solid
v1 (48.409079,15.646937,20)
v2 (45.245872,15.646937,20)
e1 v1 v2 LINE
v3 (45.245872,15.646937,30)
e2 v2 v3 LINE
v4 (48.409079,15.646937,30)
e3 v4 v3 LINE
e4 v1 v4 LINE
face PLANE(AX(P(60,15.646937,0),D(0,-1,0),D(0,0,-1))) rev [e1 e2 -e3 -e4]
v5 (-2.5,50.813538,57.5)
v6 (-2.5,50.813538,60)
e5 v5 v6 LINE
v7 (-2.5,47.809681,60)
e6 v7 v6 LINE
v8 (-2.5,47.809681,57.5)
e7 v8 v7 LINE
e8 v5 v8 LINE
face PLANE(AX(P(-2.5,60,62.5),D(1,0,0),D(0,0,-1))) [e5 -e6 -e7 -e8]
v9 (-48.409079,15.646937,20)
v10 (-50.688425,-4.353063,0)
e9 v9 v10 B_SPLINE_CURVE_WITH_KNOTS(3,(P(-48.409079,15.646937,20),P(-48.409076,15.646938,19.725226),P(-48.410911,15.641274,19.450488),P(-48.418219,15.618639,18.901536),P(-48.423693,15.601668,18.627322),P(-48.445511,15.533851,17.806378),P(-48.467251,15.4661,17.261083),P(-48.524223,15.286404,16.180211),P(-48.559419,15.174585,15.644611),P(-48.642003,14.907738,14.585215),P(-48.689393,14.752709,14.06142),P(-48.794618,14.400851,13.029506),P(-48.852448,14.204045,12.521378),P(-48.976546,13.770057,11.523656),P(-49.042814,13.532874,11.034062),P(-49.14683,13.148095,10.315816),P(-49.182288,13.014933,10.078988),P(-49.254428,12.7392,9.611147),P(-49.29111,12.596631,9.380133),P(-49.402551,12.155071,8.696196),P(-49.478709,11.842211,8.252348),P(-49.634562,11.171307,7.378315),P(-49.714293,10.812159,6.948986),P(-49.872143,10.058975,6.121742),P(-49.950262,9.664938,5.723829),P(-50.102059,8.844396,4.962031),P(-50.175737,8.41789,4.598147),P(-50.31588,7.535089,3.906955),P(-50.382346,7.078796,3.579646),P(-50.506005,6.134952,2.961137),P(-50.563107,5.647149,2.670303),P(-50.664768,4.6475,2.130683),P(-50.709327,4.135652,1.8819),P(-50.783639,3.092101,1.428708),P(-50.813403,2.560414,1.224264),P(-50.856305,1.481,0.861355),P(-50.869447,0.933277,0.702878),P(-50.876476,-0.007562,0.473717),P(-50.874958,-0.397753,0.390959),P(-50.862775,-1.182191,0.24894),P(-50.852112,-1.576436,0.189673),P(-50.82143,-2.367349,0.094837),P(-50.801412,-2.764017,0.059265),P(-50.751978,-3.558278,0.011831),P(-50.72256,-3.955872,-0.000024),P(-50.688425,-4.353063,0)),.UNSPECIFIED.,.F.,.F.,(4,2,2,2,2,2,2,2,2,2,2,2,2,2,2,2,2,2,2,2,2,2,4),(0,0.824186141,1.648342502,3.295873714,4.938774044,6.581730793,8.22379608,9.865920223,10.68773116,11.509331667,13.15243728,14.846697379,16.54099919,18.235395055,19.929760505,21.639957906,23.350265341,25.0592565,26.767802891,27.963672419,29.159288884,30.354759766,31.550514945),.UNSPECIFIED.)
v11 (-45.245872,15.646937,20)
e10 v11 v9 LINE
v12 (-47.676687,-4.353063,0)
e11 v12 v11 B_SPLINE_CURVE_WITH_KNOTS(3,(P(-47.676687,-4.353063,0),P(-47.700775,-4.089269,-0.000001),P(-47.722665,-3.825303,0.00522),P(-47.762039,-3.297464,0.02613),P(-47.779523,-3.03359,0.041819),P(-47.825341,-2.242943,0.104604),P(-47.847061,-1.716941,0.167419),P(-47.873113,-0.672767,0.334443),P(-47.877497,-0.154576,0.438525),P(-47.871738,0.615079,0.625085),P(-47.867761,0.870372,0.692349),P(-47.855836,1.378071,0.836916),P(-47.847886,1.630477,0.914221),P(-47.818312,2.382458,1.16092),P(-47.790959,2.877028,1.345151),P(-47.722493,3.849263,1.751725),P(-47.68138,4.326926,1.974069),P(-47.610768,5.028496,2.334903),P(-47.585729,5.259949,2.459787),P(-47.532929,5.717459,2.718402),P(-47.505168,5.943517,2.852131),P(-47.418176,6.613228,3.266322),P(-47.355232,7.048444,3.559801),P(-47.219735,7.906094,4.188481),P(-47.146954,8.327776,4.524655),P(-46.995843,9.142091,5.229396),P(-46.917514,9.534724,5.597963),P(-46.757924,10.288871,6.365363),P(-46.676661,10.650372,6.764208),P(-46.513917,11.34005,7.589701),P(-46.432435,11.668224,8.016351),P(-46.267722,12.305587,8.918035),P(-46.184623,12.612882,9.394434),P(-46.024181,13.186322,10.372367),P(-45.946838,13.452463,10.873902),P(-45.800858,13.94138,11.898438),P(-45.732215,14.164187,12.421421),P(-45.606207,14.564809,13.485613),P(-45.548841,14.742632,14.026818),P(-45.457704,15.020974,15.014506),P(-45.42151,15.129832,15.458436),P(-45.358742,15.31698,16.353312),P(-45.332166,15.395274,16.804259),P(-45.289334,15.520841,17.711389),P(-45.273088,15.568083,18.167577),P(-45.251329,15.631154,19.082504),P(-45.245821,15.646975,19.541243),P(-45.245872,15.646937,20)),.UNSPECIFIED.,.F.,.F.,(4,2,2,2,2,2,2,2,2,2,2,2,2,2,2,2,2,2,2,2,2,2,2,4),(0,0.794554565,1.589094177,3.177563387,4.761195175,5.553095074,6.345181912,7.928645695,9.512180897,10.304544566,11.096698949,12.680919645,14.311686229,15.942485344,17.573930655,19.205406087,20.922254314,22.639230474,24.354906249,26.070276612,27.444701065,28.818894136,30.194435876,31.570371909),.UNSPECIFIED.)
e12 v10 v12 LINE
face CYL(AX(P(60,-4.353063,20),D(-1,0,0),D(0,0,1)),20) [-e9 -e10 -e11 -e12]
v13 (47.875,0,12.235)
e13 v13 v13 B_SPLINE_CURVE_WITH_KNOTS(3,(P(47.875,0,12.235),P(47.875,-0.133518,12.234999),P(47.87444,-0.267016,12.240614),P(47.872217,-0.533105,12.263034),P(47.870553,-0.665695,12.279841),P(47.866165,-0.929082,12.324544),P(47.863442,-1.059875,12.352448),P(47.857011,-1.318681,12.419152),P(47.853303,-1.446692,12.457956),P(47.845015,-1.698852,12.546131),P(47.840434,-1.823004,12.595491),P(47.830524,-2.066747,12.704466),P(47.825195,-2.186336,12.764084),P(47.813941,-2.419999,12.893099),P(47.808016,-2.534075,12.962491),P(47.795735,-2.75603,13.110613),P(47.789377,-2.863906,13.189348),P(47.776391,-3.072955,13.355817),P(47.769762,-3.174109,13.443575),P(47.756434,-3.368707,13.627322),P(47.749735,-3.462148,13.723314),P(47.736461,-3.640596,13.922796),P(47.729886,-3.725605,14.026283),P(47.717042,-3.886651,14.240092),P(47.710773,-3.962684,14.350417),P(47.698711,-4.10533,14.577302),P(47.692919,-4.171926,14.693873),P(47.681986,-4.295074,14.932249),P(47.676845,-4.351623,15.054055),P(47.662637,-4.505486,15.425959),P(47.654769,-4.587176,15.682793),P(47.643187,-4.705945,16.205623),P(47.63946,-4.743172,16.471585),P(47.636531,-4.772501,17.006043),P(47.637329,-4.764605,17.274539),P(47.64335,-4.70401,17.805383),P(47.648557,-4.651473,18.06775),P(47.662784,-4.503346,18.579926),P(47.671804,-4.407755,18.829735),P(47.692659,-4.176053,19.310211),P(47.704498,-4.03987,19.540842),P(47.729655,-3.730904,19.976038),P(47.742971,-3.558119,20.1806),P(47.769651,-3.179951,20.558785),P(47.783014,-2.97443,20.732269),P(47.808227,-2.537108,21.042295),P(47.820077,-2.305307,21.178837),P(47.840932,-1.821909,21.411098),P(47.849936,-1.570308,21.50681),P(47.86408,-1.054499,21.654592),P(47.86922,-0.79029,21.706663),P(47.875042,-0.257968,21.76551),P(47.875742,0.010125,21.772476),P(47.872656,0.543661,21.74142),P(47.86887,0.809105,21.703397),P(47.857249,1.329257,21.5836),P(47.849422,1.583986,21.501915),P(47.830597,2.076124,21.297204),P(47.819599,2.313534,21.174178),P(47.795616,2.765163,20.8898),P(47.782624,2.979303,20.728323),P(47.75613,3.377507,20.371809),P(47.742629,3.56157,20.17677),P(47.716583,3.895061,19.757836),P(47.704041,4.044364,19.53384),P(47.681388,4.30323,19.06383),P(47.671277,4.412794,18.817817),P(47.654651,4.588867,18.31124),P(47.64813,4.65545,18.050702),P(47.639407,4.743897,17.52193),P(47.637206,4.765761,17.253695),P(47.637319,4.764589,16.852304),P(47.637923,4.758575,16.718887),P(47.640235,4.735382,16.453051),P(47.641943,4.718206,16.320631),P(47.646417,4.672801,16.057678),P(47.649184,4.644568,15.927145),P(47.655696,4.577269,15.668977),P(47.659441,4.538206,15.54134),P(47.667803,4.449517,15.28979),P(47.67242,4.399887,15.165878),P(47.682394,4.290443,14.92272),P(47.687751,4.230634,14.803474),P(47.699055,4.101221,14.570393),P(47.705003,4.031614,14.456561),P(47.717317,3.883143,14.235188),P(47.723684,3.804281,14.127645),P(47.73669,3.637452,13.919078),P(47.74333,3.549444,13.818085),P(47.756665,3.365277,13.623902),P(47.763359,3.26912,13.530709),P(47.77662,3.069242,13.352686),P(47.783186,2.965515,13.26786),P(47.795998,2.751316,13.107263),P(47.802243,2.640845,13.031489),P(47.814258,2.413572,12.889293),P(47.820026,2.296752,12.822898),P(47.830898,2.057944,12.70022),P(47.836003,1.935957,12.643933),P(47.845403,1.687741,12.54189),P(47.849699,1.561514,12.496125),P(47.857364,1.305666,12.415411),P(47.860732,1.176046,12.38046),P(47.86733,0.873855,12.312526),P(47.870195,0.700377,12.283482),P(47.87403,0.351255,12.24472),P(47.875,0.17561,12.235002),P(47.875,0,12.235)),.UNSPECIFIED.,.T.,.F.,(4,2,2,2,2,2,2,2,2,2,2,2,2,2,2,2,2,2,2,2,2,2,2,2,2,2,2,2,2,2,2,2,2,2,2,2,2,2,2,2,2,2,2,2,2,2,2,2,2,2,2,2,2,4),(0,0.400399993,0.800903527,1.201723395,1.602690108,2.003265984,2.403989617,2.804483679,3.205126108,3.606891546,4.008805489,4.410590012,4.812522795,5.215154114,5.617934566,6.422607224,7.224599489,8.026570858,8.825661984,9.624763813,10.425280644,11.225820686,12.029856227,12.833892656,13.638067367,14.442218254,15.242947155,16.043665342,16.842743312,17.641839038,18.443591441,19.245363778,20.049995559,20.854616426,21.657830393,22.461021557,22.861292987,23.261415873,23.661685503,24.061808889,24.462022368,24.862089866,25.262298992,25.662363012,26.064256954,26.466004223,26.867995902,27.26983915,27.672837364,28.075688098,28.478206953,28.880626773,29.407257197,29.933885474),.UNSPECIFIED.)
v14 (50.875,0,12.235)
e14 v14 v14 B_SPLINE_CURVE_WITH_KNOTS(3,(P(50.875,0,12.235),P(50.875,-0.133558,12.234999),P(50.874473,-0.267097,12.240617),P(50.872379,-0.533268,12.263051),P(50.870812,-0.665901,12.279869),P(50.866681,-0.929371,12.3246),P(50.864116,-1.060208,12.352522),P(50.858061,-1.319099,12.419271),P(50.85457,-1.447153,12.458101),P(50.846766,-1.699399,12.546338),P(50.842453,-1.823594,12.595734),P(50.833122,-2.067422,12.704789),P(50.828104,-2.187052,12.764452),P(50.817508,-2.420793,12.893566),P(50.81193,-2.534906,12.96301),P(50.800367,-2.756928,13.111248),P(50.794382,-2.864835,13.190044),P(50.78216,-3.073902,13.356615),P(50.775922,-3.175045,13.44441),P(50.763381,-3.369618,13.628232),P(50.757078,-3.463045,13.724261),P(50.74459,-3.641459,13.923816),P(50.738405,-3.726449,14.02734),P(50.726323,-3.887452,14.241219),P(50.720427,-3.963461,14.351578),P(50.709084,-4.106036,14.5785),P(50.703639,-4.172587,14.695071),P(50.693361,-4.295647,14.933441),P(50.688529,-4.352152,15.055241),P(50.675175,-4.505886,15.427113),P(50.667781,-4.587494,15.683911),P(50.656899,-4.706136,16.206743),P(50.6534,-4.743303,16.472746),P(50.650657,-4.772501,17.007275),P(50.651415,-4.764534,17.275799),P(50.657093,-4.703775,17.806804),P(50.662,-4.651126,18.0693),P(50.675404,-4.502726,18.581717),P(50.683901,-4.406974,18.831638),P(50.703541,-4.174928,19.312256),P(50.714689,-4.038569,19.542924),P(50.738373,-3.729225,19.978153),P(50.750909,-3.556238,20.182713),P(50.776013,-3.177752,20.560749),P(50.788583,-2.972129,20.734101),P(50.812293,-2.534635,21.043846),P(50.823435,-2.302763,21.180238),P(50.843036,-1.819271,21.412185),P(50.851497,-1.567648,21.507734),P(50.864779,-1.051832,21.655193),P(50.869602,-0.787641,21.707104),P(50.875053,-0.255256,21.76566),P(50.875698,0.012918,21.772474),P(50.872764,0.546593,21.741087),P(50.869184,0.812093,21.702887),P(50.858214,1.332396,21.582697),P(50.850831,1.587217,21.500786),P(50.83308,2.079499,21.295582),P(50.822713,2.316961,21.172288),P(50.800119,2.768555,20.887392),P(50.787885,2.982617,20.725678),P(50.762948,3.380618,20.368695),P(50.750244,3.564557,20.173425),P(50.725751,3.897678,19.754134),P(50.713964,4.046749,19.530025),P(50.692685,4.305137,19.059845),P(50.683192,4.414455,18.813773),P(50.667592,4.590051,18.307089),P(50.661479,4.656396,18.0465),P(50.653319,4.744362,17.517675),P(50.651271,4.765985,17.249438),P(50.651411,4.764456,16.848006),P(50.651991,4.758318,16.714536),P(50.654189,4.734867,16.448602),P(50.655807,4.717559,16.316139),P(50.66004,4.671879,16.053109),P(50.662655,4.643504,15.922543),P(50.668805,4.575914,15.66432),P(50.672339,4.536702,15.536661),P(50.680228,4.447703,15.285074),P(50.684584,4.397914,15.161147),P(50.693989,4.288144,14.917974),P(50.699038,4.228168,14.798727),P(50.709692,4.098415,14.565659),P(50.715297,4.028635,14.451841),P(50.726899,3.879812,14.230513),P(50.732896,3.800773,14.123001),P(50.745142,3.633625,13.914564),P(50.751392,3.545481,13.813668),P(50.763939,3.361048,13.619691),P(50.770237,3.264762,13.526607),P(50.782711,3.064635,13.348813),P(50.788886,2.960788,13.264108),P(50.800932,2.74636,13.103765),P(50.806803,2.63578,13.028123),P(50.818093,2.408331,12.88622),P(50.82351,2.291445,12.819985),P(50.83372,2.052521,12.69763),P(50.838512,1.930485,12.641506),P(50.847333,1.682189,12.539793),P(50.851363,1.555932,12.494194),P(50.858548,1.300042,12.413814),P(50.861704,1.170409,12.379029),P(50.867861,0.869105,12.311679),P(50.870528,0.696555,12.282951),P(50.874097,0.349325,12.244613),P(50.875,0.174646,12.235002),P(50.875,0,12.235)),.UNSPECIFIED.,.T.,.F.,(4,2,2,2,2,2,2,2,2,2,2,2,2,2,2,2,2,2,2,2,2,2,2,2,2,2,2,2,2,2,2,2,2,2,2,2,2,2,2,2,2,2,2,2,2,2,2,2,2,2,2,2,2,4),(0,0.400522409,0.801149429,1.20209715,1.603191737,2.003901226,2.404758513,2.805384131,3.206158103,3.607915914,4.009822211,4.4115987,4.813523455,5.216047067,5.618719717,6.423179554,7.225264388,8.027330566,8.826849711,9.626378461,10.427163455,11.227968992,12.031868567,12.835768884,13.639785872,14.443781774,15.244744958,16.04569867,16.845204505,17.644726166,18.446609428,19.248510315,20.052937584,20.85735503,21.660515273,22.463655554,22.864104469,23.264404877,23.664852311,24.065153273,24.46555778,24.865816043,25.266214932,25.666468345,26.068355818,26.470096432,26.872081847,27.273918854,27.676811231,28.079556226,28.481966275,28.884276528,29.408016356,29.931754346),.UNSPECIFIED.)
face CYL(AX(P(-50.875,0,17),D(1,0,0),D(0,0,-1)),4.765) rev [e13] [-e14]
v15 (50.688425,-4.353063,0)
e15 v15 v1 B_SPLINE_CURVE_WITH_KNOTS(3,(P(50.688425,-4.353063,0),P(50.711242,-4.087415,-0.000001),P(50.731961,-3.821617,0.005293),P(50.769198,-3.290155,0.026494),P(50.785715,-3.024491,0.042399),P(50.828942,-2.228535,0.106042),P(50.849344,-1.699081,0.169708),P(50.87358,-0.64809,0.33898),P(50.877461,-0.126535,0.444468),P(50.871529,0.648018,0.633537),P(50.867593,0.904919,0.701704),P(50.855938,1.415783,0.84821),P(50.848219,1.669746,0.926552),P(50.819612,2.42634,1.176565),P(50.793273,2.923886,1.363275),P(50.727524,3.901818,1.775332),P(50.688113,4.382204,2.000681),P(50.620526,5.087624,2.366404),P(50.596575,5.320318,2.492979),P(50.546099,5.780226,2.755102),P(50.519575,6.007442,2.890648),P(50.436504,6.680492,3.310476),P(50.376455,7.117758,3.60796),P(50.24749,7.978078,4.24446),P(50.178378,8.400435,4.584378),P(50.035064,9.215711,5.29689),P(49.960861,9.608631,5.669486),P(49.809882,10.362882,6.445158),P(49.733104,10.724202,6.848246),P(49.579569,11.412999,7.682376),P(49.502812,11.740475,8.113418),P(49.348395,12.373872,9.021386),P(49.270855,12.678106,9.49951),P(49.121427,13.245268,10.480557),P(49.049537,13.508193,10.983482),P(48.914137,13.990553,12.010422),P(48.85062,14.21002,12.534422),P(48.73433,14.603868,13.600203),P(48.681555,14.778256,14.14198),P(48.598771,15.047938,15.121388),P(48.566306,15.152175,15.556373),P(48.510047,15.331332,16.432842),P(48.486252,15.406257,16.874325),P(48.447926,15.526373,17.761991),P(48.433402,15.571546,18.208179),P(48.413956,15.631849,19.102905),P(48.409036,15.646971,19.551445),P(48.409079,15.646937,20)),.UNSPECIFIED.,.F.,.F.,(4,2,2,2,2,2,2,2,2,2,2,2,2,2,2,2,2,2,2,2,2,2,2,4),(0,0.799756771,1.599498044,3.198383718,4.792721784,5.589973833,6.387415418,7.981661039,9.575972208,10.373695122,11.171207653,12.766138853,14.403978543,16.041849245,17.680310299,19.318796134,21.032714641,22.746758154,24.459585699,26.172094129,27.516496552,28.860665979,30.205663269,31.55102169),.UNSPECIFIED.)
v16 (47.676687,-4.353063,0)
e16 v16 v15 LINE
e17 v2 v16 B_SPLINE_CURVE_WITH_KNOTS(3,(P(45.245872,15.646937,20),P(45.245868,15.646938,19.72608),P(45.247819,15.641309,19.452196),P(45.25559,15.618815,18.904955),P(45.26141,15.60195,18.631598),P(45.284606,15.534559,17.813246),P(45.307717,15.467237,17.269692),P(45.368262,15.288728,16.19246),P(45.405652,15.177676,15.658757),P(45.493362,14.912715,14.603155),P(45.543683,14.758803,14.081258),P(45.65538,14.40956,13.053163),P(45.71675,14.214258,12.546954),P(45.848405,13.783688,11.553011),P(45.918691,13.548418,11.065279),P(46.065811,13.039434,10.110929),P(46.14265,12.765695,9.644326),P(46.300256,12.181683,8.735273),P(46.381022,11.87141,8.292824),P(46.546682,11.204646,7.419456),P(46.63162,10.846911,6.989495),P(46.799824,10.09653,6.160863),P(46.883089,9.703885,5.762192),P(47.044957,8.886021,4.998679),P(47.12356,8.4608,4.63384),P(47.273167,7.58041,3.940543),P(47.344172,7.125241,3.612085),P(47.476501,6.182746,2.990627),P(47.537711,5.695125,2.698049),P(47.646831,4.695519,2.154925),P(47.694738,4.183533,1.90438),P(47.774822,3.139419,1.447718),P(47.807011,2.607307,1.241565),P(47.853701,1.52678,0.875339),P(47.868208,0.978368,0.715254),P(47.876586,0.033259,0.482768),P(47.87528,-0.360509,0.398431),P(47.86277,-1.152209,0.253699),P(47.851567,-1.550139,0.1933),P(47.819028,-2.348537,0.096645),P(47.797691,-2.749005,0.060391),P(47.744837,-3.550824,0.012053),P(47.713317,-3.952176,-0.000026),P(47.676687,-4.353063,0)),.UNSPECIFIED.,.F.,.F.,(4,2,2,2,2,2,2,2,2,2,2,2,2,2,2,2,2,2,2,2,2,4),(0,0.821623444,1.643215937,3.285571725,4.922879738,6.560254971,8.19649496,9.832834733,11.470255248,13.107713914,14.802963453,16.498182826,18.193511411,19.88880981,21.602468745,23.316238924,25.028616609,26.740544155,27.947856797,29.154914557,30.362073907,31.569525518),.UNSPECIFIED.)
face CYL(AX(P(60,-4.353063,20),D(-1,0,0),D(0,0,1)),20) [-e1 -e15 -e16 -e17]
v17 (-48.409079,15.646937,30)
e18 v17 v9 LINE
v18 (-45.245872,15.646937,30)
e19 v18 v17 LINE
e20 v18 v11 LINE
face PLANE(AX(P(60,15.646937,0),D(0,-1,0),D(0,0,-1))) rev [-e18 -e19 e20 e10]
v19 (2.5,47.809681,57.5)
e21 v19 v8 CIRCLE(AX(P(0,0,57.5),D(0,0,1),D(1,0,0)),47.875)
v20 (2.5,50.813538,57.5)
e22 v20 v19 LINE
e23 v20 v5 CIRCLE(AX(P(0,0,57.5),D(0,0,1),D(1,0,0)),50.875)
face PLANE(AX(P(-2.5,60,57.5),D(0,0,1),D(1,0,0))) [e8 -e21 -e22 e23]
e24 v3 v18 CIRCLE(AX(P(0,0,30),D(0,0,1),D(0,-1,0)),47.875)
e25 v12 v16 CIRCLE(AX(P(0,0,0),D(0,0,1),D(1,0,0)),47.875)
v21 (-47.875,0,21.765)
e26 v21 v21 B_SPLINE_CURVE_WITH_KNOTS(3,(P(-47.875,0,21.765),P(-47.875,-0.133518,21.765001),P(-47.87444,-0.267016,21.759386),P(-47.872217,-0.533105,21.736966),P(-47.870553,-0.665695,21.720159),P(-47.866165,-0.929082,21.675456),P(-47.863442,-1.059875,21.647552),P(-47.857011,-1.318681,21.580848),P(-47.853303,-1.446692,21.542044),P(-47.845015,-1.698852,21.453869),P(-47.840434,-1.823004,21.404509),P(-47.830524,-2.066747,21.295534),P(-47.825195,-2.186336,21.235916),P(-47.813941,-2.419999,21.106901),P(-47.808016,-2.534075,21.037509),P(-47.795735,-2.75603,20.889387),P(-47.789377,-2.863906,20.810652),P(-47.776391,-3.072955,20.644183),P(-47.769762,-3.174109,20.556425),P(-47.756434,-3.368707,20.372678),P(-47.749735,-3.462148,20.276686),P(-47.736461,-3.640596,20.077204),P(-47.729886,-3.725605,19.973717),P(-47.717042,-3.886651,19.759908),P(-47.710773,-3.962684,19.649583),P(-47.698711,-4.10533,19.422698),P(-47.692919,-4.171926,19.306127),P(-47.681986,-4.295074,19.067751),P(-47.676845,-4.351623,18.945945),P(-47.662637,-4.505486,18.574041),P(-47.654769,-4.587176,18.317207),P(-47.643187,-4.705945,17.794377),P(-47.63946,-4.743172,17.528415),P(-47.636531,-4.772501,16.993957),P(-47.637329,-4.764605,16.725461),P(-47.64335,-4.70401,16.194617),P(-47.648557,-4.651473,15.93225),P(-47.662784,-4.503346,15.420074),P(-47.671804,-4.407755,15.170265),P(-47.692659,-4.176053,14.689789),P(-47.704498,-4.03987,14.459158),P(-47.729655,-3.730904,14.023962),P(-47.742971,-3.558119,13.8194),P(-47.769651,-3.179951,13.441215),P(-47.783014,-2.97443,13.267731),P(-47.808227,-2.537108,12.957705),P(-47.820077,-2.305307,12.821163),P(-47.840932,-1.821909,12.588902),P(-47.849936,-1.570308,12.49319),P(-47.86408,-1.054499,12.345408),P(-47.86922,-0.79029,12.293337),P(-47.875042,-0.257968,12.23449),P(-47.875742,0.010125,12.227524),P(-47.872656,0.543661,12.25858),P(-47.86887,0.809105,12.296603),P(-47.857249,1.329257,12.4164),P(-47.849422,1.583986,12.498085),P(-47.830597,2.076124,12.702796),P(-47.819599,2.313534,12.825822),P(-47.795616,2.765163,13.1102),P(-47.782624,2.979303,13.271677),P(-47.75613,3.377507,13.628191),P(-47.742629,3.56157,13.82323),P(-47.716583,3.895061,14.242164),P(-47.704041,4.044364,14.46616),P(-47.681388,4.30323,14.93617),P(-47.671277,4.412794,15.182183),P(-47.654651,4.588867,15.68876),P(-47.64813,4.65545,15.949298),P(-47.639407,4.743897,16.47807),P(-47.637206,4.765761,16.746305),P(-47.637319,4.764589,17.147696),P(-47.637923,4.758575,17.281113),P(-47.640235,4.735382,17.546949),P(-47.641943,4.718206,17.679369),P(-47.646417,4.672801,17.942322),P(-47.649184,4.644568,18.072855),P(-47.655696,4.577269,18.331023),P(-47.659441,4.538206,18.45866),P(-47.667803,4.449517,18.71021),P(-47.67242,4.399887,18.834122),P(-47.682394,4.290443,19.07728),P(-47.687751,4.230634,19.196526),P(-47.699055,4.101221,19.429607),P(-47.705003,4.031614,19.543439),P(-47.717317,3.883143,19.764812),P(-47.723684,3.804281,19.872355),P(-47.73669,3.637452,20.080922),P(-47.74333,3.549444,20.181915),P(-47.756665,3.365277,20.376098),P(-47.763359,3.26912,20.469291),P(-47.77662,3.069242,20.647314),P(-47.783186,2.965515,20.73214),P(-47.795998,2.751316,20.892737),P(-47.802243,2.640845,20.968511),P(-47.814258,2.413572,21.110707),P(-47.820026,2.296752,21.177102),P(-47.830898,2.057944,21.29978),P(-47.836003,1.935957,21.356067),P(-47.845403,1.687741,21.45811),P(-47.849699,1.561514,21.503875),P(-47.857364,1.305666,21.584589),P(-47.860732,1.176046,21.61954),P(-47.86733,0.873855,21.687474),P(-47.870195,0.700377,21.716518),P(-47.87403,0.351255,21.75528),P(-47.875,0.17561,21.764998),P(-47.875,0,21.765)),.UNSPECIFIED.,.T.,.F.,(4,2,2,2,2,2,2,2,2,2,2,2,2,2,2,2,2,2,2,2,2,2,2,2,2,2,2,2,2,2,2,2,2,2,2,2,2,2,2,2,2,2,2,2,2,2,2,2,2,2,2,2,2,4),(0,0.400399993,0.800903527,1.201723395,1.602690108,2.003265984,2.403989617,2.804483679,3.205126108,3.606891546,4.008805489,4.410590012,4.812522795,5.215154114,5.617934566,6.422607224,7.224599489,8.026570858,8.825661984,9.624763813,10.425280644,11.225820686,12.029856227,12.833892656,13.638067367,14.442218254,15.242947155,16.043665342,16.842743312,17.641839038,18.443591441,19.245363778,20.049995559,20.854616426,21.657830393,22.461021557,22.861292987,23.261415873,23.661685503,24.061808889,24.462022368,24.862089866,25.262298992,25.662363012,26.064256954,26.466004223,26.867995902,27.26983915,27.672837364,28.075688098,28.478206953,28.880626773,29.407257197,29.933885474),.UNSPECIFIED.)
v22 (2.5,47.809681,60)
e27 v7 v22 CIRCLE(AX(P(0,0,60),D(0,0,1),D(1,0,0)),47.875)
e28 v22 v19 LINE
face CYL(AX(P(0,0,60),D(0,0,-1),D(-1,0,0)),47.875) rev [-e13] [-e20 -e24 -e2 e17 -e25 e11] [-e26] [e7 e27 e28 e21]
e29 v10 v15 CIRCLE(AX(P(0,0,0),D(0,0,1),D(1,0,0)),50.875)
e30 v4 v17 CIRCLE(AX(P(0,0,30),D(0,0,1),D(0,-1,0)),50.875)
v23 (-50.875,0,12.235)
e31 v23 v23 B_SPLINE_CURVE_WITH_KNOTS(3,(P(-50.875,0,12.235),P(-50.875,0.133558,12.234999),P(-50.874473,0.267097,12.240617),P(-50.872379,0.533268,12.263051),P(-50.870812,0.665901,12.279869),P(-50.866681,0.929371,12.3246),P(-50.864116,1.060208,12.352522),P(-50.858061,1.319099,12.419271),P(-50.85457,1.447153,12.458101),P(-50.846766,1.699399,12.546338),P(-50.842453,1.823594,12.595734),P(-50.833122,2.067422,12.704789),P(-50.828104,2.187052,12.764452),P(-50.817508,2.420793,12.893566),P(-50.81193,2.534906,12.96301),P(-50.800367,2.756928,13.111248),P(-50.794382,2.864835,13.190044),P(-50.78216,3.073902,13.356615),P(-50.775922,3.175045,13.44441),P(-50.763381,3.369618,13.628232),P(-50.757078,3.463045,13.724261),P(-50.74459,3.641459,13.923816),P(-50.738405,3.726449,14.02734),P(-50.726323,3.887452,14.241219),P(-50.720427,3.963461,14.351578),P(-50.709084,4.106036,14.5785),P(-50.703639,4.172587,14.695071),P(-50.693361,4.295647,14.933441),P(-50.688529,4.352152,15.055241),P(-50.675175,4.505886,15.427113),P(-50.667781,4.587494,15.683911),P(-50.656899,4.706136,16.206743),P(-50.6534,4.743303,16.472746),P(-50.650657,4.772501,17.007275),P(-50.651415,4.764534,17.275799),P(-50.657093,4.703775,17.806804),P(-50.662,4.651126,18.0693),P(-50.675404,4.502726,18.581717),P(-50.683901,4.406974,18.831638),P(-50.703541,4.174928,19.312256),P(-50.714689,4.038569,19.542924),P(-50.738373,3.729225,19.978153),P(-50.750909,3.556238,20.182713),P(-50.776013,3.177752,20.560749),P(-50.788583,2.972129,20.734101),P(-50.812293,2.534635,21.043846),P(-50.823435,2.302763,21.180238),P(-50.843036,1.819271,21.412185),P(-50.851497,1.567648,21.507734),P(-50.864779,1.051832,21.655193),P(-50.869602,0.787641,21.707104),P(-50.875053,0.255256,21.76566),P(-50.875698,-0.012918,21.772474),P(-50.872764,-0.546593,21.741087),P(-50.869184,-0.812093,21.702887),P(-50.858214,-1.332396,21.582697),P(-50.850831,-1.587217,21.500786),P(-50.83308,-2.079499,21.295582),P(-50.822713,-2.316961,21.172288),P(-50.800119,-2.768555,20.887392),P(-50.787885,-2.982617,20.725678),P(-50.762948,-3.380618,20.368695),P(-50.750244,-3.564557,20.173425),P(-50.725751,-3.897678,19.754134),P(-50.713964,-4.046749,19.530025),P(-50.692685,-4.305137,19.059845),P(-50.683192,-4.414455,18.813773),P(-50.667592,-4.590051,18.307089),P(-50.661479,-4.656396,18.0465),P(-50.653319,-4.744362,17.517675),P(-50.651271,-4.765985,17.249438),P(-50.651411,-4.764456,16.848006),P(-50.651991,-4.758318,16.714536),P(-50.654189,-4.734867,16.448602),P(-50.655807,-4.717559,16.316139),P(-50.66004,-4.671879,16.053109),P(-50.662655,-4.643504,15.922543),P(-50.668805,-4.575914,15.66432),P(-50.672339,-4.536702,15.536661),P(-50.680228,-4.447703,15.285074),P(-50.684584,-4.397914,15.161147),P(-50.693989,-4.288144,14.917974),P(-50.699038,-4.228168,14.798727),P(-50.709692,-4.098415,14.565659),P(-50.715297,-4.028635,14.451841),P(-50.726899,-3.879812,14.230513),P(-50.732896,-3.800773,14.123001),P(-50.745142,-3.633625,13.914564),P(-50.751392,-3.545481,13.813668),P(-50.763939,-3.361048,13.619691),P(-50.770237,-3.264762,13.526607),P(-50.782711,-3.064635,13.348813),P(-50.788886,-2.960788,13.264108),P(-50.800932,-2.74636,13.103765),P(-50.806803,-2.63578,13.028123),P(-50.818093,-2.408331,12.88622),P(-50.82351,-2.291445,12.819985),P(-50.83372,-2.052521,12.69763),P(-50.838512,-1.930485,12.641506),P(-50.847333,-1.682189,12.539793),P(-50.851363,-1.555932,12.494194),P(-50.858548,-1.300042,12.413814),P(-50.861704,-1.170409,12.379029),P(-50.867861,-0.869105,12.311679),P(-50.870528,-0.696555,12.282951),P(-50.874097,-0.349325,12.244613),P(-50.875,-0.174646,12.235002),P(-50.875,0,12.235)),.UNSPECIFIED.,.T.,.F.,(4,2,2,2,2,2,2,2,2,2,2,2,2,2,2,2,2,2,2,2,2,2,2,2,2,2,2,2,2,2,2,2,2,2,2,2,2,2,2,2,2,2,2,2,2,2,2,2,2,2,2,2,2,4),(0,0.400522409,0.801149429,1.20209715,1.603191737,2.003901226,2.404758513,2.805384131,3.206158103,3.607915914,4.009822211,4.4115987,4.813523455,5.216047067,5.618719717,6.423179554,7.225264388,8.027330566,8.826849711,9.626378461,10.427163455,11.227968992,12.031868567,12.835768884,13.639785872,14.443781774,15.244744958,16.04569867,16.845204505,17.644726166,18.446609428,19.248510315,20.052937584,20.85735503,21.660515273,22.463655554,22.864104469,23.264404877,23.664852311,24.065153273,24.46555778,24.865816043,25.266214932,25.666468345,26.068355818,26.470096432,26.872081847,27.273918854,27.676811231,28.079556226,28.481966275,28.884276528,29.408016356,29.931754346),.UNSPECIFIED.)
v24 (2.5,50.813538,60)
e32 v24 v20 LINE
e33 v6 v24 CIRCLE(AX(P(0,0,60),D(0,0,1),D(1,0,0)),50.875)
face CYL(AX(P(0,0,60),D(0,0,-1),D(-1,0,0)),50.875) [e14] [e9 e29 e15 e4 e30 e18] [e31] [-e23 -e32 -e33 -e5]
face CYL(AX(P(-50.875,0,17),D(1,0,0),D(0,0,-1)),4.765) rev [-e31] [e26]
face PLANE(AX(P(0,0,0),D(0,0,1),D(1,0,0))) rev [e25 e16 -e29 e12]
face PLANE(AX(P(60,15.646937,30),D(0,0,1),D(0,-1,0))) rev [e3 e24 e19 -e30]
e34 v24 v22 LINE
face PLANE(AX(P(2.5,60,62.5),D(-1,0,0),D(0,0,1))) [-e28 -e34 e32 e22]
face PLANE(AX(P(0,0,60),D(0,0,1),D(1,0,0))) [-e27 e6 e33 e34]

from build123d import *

# Parameters (mm, degrees)
SKETCH2_R               = 50.875
SKETCH2_R_2             = 47.875
BOSS_EXTRUDE1_DEPTH     = 60
CUT_EXTRUDE2_DEPTH      = 60
CUT_EXTRUDE2_DEPTH_BACK = 60
SKETCH3_OUTSIDE_W       = 93.18
SKETCH3_OUTSIDE_H       = 134.93
CUT_EXTRUDE3_DEPTH      = 94.683142827
CUT_EXTRUDE3_DEPTH_BACK = 94.683142827
SKETCH4_R               = 4.765
FILLET1_R               = 20
SKETCH5_W               = 5
SKETCH5_H               = 5
CUT_EXTRUDE4_DEPTH      = 60


with BuildPart() as part:
    # Sketch2 → Boss-Extrude1 (new body)
    with BuildSketch(Plane.XY):
        with Locations(Location((0, 0, 0), (0, 0, 180))):
            Circle(SKETCH2_R)
        with Locations(Location((0, 0, 0), (0, 0, 180))):
            Circle(SKETCH2_R_2, mode=Mode.SUBTRACT)
    extrude(amount=BOSS_EXTRUDE1_DEPTH)

    # Sketch3 outside → Cut-Extrude2 (cut, two sides: drawn at the far end of the back side and taken through both)
    with BuildSketch(Plane(origin=(0, 0, 0), x_dir=(0, 0, -1), z_dir=(1, 0, 0)).offset(-CUT_EXTRUDE2_DEPTH_BACK)):
        with Locations((-30, 0)):
            Rectangle(SKETCH3_OUTSIDE_W, SKETCH3_OUTSIDE_H)
        Polygon((-60, 50.875), (-60, -50.875), (0, -50.875), (0, 15.646937383), (-30, 15.646937383), (-30, 50.875), align=None, mode=Mode.SUBTRACT)
    extrude(amount=CUT_EXTRUDE2_DEPTH + CUT_EXTRUDE2_DEPTH_BACK, mode=Mode.SUBTRACT)

    # Sketch4 → Cut-Extrude3 (cut, two sides: drawn at the far end of the back side and taken through both)
    with BuildSketch(Plane(origin=(0, 0, 0), x_dir=(0, 0, -1), z_dir=(1, 0, 0)).offset(-CUT_EXTRUDE3_DEPTH_BACK)):
        with Locations((-17, 0)):
            Circle(SKETCH4_R)
    extrude(amount=CUT_EXTRUDE3_DEPTH + CUT_EXTRUDE3_DEPTH_BACK, mode=Mode.SUBTRACT)

    # Fillet1
    # the kernel refuses this fillet: 20 mm, written as the material it takes off along each edge
    with BuildSketch(Plane(origin=(-4.75412753, 15.646937383, 0), x_dir=(0, -1, 0), z_dir=(1, 0, 0)), Plane(origin=(-98.409079474, 15.646937383, 0), x_dir=(0, -1, 0), z_dir=(1, 0, 0))) as fillet1_piece_1:
        with BuildLine():
            CenterArc((FILLET1_R, -FILLET1_R), FILLET1_R, 90, 90)
            Line((0, -FILLET1_R), (0, 0))
            Line((0, 0), (FILLET1_R, 0))
        make_face()
    extrude(amount=103.163207005, mode=Mode.SUBTRACT)

    # Sketch5 → Cut-Extrude4 (cut)
    with BuildSketch(Plane(origin=(0, 0, 0), x_dir=(1, 0, 0), z_dir=(0, 1, 0))):
        with Locations((0, -60)):
            Rectangle(SKETCH5_W, SKETCH5_H)
    extrude(amount=CUT_EXTRUDE4_DEPTH, mode=Mode.SUBTRACT)


solid = part.part
